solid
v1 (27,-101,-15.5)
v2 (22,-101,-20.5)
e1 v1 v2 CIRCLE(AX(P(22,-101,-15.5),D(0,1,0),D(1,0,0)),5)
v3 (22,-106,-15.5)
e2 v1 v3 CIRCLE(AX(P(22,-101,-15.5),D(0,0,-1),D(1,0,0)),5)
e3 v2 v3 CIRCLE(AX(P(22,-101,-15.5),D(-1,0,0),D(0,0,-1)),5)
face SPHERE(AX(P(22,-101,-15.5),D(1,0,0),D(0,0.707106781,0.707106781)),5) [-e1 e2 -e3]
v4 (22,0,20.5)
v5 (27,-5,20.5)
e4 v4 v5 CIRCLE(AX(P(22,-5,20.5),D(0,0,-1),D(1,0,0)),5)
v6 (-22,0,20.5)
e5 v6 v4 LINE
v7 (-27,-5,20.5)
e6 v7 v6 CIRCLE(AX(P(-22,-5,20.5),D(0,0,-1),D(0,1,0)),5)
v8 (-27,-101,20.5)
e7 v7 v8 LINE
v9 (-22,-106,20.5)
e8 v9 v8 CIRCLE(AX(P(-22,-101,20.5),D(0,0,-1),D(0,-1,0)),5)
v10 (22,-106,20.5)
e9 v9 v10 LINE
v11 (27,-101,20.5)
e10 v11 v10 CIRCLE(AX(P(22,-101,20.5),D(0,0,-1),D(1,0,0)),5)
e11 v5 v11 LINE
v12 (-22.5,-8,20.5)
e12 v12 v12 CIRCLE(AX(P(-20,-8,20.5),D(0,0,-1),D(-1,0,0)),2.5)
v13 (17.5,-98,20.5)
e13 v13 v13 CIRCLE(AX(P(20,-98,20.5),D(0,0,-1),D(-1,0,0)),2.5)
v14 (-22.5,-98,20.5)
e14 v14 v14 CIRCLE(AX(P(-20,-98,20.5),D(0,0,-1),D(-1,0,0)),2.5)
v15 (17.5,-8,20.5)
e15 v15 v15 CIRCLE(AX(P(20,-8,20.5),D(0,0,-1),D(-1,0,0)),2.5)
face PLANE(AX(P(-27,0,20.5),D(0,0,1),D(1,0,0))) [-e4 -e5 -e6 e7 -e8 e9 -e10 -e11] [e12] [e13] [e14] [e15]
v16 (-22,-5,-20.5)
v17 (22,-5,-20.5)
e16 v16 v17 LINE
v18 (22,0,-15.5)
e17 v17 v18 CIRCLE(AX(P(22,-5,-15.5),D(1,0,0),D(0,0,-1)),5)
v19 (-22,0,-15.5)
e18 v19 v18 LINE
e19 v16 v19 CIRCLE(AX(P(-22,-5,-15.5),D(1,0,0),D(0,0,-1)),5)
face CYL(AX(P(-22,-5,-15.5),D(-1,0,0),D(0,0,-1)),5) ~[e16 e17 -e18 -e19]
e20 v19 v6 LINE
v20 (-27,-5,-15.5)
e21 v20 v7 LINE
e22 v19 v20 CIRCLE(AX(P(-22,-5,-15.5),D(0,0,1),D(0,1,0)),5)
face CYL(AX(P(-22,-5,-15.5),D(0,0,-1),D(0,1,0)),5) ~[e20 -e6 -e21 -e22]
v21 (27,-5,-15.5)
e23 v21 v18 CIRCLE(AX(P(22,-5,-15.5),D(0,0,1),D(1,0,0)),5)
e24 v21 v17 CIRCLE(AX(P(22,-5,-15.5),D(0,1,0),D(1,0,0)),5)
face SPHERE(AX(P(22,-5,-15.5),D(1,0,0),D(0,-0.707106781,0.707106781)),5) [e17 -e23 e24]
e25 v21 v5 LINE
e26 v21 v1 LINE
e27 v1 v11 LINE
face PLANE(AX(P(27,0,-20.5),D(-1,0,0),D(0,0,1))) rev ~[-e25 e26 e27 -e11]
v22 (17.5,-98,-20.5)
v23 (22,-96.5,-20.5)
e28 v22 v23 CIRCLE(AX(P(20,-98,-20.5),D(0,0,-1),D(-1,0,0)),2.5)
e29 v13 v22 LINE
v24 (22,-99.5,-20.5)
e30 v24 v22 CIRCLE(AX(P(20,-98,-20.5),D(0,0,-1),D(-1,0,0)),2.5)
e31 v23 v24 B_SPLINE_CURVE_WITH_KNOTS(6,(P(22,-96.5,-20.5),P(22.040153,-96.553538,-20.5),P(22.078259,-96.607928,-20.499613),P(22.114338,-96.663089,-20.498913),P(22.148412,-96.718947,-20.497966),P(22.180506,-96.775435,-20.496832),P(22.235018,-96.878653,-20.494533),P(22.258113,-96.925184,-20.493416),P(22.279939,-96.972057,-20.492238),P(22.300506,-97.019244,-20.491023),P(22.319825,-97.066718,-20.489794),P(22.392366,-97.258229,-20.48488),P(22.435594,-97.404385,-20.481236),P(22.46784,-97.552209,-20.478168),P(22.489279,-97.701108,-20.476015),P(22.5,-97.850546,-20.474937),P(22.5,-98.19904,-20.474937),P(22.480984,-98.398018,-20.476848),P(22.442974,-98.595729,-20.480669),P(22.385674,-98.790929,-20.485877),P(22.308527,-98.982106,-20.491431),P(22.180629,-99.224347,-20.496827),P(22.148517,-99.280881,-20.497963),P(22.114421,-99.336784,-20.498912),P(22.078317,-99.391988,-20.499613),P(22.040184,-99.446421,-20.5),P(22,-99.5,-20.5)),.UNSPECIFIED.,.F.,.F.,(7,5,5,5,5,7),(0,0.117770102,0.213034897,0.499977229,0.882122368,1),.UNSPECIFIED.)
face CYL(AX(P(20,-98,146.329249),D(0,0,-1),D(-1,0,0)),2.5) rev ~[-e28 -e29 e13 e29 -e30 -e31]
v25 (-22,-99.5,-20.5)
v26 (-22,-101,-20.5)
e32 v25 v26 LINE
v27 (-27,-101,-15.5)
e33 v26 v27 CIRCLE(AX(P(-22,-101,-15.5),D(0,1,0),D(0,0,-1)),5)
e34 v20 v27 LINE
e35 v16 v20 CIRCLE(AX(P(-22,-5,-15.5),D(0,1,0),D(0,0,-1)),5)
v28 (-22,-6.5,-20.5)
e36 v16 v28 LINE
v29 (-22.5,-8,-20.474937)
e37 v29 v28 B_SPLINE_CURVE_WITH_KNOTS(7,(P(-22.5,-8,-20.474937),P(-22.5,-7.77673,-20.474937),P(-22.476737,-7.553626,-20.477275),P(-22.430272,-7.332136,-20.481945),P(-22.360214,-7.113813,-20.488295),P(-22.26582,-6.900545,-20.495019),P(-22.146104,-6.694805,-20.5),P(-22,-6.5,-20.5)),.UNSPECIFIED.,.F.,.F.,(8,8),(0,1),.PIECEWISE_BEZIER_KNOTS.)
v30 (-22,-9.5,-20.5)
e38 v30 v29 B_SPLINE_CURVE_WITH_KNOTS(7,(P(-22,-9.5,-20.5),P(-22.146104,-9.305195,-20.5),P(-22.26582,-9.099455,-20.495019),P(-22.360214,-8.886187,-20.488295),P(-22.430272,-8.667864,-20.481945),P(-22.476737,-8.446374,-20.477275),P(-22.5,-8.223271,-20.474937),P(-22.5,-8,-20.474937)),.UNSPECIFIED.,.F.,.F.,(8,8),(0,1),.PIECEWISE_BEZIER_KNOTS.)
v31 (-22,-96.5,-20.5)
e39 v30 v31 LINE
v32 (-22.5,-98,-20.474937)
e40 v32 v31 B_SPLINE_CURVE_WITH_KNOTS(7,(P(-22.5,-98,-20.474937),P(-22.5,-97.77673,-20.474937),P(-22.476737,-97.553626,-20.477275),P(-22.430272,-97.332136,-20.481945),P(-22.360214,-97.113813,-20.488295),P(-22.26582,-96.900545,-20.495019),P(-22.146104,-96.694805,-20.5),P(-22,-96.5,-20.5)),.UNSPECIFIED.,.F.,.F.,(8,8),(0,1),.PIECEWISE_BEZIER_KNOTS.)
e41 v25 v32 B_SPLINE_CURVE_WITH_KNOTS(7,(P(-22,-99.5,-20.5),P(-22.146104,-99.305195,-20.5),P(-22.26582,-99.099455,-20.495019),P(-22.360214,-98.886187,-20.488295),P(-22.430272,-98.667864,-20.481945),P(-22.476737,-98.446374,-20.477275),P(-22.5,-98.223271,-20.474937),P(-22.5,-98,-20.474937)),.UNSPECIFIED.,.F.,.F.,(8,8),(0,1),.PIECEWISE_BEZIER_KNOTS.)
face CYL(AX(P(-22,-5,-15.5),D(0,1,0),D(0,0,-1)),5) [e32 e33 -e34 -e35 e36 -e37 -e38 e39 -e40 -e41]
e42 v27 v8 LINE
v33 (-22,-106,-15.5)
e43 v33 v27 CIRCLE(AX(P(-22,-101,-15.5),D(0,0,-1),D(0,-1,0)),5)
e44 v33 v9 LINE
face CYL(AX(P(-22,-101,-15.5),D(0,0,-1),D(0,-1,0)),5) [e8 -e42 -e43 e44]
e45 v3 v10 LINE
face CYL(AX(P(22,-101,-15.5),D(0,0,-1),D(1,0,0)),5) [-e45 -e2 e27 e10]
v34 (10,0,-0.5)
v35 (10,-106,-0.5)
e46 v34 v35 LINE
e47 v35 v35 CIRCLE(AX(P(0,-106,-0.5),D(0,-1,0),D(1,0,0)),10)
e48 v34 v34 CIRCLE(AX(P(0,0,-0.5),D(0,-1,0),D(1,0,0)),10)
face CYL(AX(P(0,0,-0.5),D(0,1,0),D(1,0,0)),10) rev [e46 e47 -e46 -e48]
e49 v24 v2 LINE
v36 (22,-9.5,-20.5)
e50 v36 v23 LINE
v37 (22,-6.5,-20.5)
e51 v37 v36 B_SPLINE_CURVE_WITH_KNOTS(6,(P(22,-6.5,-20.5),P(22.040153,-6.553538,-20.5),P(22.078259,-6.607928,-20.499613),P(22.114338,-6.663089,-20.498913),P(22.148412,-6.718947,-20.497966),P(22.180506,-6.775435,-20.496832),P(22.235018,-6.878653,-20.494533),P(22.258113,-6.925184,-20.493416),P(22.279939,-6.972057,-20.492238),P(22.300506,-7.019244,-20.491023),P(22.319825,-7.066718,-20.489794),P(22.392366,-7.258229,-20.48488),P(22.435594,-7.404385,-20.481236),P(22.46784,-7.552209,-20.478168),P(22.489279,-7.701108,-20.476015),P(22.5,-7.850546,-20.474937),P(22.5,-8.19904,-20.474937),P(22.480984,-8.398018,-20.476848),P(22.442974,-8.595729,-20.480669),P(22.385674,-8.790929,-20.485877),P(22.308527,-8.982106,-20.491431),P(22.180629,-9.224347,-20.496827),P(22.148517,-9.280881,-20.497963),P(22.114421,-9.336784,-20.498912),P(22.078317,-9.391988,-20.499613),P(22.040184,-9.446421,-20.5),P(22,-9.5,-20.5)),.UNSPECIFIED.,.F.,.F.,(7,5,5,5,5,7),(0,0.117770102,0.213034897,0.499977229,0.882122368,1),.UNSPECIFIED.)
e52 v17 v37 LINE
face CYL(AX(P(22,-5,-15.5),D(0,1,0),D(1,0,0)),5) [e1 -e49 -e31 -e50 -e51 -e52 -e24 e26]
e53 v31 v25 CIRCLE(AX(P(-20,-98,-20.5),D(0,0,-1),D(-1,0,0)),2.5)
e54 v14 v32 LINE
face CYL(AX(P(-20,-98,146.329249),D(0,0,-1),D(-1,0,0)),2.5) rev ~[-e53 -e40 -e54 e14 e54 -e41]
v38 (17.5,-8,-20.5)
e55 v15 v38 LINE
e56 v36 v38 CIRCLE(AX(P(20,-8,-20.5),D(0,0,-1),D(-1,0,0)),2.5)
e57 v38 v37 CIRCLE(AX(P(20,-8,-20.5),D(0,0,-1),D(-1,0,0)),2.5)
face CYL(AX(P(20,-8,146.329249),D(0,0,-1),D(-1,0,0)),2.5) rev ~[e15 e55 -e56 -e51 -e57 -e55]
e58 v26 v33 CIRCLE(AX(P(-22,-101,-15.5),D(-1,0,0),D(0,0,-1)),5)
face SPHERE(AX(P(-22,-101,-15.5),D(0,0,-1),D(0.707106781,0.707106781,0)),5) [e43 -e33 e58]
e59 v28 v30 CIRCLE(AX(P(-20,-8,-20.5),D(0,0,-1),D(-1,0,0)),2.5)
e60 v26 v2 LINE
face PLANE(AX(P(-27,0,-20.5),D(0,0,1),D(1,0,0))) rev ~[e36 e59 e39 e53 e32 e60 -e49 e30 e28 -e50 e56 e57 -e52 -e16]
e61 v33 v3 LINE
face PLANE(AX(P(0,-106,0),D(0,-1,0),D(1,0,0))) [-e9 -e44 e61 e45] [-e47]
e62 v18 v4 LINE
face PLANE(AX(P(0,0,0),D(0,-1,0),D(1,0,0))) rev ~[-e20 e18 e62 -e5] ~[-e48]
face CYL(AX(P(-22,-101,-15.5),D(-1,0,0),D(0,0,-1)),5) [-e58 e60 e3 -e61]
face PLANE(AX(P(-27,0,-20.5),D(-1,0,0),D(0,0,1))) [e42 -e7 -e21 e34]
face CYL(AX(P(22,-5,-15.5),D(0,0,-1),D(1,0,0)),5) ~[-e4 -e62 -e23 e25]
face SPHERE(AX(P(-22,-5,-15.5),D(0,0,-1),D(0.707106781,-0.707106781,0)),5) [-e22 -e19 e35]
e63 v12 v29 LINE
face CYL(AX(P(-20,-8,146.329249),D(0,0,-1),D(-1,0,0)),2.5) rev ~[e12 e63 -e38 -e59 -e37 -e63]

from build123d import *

# Parameters (mm, degrees)
F0_W         = 54
F0_H         = 41
F0_R         = 10
F1_DEPTH     = 106
F3_D         = 5
F4_T1_DEPTH  = 48.5
F4_T3_DEPTH  = 44
F4_T5_DEPTH  = 96
F4_S9_W      = 5
F4_S9_H      = 5
F4_T10_DEPTH = 5
F4_S15_W     = 5
F4_S15_H     = 5
F4_T16_DEPTH = 5
F4_S21_W     = 5
F4_S21_H     = 5
F4_T22_DEPTH = 5
F4_S27_W     = 5
F4_S27_H     = 5
F4_T28_DEPTH = 5


# Not quite as in the source:
# - a fillet or chamfer that OpenCascade refuses, or shapes differently, is made with other operations: its cross-section is extruded or revolved along the edge and cut away or added


with BuildPart() as f1:
    # F0 (on Front) → F1 (new body)
    with BuildSketch(Plane.XZ):
        Rectangle(F0_W, F0_H)
        with Locations((0, -0.5)):
            Circle(F0_R, mode=Mode.SUBTRACT)
    extrude(amount=F1_DEPTH)

    # F3 (through all)
    with Locations(Plane.XY.offset(20.5)):
        with Locations((-20, -8), (20, -8), (-20, -98), (20, -98)):
            Hole(F3_D / 2)

    # F4: fillet of radius 5 on 8 edges, made by hand

    # F4_s2 → F4_t1 (cut)
    with BuildSketch(Plane.XY.offset(-15.5)):
        with BuildLine():
            ThreePointArc((-22, -106), (-25.5355339059, -104.5355339059), (-27, -101))
            Line((-27, -101), (-27, -106))
            Line((-27, -106), (-22, -106))
        make_face()
        with BuildLine():
            ThreePointArc((27, -101), (25.5355339059, -104.5355339059), (22, -106))
            Line((22, -106), (27, -106))
            Line((27, -106), (27, -101))
        make_face()
        with BuildLine():
            ThreePointArc((27, -5), (25.5355339059, -1.4644660941), (22, 0))
            Line((22, 0), (27, 0))
            Line((27, 0), (27, -5))
        make_face()
        with BuildLine():
            ThreePointArc((-22, 0), (-25.5355339059, -1.4644660941), (-27, -5))
            Line((-27, -5), (-27, 0))
            Line((-27, 0), (-22, 0))
        make_face()
    extrude(amount=F4_T1_DEPTH, mode=Mode.SUBTRACT)

    # F4_s4 → F4_t3 (cut)
    with BuildSketch(Plane.YZ.offset(-22)):
        with BuildLine():
            ThreePointArc((-101, -20.5), (-104.5355339059, -19.0355339059), (-106, -15.5))
            Line((-106, -15.5), (-106, -20.5))
            Line((-106, -20.5), (-101, -20.5))
        make_face()
        with BuildLine():
            ThreePointArc((-5, -20.5), (-1.4644660941, -19.0355339059), (0, -15.5))
            Line((0, -15.5), (0, -20.5))
            Line((0, -20.5), (-5, -20.5))
        make_face()
    extrude(amount=F4_T3_DEPTH, mode=Mode.SUBTRACT)

    # F4_s6 → F4_t5 (cut)
    with BuildSketch(Plane.XZ.offset(5)):
        with BuildLine():
            ThreePointArc((27, -15.5), (25.5355339059, -19.0355339059), (22, -20.5))
            Line((22, -20.5), (27, -20.5))
            Line((27, -20.5), (27, -15.5))
        make_face()
        with BuildLine():
            ThreePointArc((-22, -20.5), (-25.5355339059, -19.0355339059), (-27, -15.5))
            Line((-27, -15.5), (-27, -20.5))
            Line((-27, -20.5), (-22, -20.5))
        make_face()
    extrude(amount=F4_T5_DEPTH, mode=Mode.SUBTRACT)


with BuildPart() as f4_tool8:
    # F4_s9 → F4_t10 (new body)
    with BuildSketch(Plane.XY.offset(-15.5)):
        with Locations((-24.5, -103.5)):
            Rectangle(F4_S9_W, F4_S9_H)
    extrude(amount=-F4_T10_DEPTH)

    # F4_s11 → F4_t12 (revolve, cut)
    with BuildSketch(Plane(origin=(-22, -101, -15.5), x_dir=(0.7071067812, 0.7071067812, 0), z_dir=(-0.7071067812, 0.7071067812, 0))):
        with BuildLine():
            ThreePointArc((0, -5), (5, 0), (0, 5))
            Line((0, 5), (0, -5))
        make_face()
    revolve(axis=Axis((-22, -101, -15.5), (0, 0, -1)), mode=Mode.SUBTRACT)


with BuildPart() as f1_1:
    add(f1.part)

    # F4_t7: cut F4_tool8
    add(f4_tool8.part, mode=Mode.SUBTRACT)


with BuildPart() as f4_tool14:
    # F4_s15 → F4_t16 (new body)
    with BuildSketch(Plane.YZ.offset(22)):
        with Locations((-103.5, -18)):
            Rectangle(F4_S15_W, F4_S15_H)
    extrude(amount=F4_T16_DEPTH)

    # F4_s17 → F4_t18 (revolve, cut)
    with BuildSketch(Plane(origin=(22, -101, -15.5), x_dir=(0, 0.7071067812, 0.7071067812), z_dir=(0, 0.7071067812, -0.7071067812))):
        with BuildLine():
            ThreePointArc((0, -5), (5, 0), (0, 5))
            Line((0, 5), (0, -5))
        make_face()
    revolve(axis=Axis((22, -101, -15.5), (1, 0, 0)), mode=Mode.SUBTRACT)


with BuildPart() as f1_2:
    add(f1_1.part)

    # F4_t13: cut F4_tool14
    add(f4_tool14.part, mode=Mode.SUBTRACT)


with BuildPart() as f4_tool20:
    # F4_s21 → F4_t22 (new body)
    with BuildSketch(Plane.YZ.offset(22)):
        with Locations((-2.5, -18)):
            Rectangle(F4_S21_W, F4_S21_H)
    extrude(amount=F4_T22_DEPTH)

    # F4_s23 → F4_t24 (revolve, cut)
    with BuildSketch(Plane(origin=(22, -5, -15.5), x_dir=(0, -0.7071067812, 0.7071067812), z_dir=(0, 0.7071067812, 0.7071067812))):
        with BuildLine():
            ThreePointArc((0, -5), (5, 0), (0, 5))
            Line((0, 5), (0, -5))
        make_face()
    revolve(axis=Axis((22, -5, -15.5), (1, 0, 0)), mode=Mode.SUBTRACT)


with BuildPart() as f1_3:
    add(f1_2.part)

    # F4_t19: cut F4_tool20
    add(f4_tool20.part, mode=Mode.SUBTRACT)


with BuildPart() as f4_tool26:
    # F4_s27 → F4_t28 (new body)
    with BuildSketch(Plane.XY.offset(-15.5)):
        with Locations((-24.5, -2.5)):
            Rectangle(F4_S27_W, F4_S27_H)
    extrude(amount=-F4_T28_DEPTH)

    # F4_s29 → F4_t30 (revolve, cut)
    with BuildSketch(Plane(origin=(-22, -5, -15.5), x_dir=(0.7071067812, -0.7071067812, 0), z_dir=(0.7071067812, 0.7071067812, 0))):
        with BuildLine():
            ThreePointArc((0, -5), (5, 0), (0, 5))
            Line((0, 5), (0, -5))
        make_face()
    revolve(axis=Axis((-22, -5, -15.5), (0, 0, -1)), mode=Mode.SUBTRACT)


with BuildPart() as f1_4:
    add(f1_3.part)

    # F4_t25: cut F4_tool26
    add(f4_tool26.part, mode=Mode.SUBTRACT)


solid = f1_4.part
